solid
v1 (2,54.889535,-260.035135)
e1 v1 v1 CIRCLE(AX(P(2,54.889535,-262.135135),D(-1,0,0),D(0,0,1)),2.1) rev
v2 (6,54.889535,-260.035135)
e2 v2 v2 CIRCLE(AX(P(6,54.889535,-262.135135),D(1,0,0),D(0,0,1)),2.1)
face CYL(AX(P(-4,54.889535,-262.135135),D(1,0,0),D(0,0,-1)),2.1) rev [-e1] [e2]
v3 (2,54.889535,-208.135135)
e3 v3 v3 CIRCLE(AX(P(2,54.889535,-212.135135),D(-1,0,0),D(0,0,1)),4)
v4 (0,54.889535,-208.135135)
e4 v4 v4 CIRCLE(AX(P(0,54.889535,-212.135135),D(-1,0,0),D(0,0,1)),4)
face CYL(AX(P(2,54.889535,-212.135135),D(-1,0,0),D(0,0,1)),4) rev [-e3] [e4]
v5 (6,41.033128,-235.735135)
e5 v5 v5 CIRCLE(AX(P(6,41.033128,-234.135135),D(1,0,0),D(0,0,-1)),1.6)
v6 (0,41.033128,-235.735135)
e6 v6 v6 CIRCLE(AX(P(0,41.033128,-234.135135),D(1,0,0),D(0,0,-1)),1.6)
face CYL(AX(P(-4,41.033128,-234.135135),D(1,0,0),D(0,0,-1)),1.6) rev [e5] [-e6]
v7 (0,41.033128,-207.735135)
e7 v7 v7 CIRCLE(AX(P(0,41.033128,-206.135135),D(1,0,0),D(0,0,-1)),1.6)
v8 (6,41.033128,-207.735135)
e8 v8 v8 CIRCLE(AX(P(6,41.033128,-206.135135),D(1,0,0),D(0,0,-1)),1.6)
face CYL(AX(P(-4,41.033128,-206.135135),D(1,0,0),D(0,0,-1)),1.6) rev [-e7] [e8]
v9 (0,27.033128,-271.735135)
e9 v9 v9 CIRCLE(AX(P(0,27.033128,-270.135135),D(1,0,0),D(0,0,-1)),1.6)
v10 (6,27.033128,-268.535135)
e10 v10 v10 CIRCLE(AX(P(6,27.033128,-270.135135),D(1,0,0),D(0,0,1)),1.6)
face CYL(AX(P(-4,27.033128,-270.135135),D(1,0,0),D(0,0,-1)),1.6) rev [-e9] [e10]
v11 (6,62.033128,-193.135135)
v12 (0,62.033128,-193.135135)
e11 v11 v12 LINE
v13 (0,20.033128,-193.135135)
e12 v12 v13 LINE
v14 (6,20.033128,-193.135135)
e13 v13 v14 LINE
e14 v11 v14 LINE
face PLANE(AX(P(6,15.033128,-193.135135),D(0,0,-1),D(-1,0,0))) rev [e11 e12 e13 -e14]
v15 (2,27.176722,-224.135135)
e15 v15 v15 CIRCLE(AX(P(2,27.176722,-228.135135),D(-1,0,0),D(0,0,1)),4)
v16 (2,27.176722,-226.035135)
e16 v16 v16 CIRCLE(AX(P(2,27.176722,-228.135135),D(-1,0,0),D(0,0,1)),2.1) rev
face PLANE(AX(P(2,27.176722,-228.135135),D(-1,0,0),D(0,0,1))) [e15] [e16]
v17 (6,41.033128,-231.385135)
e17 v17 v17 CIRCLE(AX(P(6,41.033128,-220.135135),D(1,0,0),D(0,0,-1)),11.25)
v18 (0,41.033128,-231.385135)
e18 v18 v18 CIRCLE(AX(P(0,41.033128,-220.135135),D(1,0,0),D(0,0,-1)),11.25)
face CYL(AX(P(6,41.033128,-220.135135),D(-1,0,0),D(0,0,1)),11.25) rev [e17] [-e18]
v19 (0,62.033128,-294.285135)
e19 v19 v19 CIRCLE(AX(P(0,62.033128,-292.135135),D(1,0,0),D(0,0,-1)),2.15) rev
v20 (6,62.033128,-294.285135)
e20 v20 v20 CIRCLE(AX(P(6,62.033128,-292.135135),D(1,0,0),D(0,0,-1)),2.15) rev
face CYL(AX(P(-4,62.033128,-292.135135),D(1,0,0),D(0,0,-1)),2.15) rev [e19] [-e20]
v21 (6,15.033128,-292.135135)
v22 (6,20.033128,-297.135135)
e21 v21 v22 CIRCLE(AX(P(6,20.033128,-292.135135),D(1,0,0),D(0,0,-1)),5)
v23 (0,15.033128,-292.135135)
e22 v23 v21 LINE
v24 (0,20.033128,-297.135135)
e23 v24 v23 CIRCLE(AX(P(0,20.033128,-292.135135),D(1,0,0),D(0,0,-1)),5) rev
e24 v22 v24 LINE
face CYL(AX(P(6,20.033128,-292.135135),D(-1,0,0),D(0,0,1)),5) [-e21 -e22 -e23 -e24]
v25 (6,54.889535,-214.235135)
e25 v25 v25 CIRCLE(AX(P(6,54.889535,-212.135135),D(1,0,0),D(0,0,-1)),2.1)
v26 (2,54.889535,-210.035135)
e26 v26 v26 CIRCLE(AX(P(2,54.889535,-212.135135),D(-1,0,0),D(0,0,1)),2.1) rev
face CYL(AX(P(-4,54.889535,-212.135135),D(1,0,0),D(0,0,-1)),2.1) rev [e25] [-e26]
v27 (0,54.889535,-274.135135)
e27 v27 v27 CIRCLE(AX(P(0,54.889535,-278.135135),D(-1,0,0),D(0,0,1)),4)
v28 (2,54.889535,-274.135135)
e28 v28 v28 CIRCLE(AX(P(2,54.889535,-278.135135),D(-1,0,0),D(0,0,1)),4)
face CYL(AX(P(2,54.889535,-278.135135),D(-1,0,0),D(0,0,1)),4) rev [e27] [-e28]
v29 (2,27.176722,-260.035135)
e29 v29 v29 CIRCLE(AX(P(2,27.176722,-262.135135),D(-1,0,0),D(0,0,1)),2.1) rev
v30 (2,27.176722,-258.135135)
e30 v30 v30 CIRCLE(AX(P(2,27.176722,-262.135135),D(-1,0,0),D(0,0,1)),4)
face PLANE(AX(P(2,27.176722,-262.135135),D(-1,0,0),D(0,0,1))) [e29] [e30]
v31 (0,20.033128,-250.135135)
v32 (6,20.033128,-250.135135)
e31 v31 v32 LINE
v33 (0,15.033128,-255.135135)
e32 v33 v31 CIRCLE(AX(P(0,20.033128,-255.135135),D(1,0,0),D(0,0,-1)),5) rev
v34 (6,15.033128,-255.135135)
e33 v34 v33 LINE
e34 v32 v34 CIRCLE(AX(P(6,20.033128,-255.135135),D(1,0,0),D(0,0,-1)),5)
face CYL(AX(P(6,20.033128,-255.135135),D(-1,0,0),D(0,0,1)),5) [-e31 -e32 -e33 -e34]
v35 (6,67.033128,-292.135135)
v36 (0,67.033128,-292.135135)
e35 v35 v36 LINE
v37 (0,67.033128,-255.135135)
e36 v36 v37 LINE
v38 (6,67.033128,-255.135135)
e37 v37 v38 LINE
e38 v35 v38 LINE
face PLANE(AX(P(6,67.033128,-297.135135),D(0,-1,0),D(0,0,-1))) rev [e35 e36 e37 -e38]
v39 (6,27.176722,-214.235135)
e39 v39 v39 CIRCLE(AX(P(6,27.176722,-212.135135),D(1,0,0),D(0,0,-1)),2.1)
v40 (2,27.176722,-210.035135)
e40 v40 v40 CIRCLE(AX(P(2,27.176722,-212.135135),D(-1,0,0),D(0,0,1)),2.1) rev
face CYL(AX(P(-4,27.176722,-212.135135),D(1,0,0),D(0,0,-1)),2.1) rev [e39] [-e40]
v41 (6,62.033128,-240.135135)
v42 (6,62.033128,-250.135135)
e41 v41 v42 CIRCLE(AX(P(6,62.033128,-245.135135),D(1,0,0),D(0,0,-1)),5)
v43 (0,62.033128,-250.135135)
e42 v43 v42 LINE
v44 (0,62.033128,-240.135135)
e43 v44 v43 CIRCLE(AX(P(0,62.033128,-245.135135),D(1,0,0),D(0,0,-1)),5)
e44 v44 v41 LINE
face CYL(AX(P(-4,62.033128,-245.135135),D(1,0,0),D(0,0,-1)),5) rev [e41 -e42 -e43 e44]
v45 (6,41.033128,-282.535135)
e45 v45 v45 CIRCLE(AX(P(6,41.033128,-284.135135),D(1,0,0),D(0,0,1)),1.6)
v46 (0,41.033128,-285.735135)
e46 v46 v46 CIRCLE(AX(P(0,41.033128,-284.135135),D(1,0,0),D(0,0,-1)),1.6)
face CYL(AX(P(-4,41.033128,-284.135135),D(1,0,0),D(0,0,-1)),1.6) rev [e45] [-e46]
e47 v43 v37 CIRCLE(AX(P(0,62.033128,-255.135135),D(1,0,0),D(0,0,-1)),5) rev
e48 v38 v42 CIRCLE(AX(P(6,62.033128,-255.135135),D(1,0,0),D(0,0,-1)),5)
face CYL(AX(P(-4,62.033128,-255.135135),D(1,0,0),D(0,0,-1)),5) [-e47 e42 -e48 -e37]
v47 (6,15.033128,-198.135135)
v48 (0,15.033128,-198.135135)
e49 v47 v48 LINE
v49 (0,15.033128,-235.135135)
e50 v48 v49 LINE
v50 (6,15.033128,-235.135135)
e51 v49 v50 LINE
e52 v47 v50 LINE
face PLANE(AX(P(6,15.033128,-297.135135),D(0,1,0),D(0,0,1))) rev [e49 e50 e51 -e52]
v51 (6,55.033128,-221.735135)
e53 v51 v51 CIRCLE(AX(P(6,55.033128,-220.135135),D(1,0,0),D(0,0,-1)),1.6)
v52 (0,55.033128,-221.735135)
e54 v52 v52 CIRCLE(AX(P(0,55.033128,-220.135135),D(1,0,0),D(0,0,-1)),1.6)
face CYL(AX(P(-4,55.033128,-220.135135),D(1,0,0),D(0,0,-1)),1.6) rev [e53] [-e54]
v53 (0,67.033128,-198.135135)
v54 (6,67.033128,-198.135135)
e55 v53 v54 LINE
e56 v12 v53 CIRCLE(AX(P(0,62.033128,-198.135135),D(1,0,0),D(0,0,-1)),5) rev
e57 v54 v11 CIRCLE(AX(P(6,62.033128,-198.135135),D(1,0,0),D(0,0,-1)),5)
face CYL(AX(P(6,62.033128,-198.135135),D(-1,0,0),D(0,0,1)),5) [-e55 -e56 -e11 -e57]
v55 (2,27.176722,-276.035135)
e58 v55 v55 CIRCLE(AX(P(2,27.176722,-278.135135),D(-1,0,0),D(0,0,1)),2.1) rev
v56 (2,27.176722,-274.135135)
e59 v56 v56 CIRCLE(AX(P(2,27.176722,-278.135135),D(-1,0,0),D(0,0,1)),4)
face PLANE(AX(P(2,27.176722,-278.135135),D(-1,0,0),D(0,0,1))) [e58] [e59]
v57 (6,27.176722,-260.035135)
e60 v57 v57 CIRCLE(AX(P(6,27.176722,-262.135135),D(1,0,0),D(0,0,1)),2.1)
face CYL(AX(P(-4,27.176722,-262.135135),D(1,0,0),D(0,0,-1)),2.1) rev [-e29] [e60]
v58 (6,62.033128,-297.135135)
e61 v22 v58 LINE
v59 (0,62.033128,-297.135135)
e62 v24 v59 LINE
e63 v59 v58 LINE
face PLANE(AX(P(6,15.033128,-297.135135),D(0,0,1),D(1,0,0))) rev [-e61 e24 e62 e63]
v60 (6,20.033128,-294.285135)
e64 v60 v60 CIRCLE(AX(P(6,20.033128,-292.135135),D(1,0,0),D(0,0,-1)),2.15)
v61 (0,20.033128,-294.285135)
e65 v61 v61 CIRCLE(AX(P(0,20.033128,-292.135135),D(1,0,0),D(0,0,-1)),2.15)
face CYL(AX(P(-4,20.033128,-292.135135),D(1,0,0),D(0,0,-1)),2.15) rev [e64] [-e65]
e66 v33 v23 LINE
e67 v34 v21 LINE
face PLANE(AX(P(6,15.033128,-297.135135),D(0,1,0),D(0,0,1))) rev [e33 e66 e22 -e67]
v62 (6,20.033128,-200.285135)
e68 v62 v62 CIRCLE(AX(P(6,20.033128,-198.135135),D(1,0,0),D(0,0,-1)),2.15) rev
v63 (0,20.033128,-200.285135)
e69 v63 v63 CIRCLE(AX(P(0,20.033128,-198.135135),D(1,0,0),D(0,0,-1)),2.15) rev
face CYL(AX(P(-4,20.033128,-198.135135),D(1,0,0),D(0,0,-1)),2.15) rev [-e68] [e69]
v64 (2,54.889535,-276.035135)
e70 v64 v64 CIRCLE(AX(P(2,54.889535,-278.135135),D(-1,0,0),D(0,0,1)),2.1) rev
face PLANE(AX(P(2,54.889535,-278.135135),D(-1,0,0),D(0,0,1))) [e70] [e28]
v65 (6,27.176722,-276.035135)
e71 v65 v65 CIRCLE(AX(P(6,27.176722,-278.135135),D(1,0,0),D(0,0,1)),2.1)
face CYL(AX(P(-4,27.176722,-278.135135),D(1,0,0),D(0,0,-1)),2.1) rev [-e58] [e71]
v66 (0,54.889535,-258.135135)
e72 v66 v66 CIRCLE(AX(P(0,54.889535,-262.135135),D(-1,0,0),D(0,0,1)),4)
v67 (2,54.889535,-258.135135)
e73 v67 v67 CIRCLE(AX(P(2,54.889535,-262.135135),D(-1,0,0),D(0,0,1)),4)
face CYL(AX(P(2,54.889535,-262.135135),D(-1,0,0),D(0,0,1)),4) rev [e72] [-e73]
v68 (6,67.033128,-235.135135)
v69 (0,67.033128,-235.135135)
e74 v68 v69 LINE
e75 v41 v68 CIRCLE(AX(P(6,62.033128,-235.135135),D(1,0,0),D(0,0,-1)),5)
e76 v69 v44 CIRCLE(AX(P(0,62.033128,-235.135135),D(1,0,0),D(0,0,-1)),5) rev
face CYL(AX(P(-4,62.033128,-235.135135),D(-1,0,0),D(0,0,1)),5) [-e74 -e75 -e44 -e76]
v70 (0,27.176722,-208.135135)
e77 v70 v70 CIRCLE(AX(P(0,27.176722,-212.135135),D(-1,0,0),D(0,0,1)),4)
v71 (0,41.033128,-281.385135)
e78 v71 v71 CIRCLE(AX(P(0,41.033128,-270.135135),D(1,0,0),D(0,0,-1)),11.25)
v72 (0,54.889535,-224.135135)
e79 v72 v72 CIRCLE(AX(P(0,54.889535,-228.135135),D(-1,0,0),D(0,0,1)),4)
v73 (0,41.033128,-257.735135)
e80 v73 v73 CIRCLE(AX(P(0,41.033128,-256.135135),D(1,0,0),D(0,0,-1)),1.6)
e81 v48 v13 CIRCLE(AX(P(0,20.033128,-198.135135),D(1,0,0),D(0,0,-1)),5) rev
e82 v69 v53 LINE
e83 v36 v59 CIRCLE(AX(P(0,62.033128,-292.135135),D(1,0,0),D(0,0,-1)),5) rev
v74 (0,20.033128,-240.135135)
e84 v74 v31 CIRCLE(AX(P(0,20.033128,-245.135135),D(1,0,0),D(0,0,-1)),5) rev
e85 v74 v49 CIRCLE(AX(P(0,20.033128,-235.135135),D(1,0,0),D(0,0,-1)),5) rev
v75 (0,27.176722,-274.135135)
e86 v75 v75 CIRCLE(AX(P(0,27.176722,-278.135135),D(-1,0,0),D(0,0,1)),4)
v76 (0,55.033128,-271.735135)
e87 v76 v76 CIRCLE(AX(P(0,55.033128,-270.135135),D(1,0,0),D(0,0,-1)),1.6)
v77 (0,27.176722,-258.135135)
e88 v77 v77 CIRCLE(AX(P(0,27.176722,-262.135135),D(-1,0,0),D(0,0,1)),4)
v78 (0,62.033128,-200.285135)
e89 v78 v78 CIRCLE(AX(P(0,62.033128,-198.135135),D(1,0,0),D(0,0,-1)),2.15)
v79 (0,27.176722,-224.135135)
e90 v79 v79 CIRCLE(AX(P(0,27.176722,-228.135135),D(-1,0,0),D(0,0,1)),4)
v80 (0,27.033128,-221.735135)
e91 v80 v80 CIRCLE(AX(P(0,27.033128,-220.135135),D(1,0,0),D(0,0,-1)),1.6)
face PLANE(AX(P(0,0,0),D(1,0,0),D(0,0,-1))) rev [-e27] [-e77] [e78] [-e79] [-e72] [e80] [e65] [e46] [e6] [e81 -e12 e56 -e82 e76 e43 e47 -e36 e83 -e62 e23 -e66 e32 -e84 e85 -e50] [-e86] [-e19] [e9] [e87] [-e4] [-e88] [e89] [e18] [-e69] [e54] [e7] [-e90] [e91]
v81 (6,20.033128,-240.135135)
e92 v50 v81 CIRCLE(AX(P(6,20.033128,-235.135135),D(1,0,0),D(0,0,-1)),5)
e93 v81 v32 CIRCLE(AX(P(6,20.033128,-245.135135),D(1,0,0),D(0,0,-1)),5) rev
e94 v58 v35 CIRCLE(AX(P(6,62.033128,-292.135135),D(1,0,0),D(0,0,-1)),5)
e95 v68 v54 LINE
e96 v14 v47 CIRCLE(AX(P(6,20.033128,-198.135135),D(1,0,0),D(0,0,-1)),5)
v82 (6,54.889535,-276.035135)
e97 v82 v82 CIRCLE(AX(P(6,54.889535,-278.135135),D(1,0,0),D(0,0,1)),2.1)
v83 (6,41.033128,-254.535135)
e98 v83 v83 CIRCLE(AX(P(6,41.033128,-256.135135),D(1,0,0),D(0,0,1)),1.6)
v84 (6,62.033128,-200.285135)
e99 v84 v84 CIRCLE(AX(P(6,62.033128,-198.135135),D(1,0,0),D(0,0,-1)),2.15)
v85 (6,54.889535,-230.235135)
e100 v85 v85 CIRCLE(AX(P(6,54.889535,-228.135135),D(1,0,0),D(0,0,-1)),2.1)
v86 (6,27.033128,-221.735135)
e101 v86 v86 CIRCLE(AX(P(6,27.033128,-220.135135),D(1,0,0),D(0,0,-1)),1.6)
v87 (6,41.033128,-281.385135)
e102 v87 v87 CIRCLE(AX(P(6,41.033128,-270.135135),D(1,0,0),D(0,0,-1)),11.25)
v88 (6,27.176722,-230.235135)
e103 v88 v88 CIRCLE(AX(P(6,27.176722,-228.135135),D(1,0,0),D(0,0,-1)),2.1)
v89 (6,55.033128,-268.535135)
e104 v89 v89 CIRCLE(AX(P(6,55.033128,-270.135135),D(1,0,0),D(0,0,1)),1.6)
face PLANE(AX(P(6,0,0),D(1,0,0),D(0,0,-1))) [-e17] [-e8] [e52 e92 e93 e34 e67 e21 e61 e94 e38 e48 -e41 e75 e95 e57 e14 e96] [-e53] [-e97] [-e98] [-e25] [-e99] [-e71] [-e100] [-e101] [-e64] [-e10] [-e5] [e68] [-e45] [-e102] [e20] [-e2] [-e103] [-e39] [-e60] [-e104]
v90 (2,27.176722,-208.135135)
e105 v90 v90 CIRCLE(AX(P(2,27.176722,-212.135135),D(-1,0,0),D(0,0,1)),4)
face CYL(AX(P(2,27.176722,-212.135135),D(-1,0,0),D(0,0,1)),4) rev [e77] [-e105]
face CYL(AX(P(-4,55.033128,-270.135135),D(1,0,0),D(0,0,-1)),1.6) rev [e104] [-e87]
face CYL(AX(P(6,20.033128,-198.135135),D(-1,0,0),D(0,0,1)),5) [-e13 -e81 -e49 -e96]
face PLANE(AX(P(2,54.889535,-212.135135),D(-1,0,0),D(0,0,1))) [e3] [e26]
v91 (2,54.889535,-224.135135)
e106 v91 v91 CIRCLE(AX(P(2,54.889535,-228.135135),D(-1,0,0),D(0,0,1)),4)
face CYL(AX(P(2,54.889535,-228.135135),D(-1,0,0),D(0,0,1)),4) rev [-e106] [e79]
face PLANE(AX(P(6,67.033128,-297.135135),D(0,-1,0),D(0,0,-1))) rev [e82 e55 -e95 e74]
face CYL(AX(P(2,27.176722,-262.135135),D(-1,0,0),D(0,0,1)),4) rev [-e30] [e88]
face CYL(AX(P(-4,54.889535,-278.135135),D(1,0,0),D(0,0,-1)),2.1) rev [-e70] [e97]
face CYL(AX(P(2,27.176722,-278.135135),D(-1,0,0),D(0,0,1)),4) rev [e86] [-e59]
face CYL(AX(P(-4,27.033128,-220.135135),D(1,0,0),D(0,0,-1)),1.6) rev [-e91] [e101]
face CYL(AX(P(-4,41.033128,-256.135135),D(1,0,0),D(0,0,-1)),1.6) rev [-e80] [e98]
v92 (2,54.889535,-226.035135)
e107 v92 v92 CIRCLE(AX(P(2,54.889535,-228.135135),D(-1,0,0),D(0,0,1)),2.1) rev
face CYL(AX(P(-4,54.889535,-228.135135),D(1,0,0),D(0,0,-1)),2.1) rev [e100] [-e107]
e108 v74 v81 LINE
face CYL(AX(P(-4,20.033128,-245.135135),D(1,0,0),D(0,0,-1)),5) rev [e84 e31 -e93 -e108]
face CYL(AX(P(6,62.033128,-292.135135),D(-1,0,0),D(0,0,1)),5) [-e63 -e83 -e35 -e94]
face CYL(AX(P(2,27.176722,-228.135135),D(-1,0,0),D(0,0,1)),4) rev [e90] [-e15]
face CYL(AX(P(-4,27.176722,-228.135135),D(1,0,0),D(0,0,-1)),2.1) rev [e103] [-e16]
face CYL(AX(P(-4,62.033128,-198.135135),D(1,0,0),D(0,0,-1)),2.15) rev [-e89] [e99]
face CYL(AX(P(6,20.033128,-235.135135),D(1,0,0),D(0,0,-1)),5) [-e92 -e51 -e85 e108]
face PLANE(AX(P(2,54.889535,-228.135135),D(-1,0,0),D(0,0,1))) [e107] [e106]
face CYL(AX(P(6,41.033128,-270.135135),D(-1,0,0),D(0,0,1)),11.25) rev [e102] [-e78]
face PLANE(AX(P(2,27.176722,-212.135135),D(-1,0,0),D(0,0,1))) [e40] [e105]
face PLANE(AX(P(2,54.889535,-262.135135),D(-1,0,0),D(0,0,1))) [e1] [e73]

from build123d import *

# Parameters (mm, degrees)
SKETCH_1_W          = 104
SKETCH_1_H          = 52
SKETCH_1_R          = 11.25
EXTRUDE_1_DEPTH     = 6
SKETCH_2_R          = 2.15
SKETCH_2_R_2        = 5
CUT_EXTRUDE_1_DEPTH = 10
FILLET_2_R          = 5
SKETCH_3_R          = 1.6
SKETCH_3_R_2        = 2.1
CUT_EXTRUDE_2_DEPTH = 10
SKETCH1_R           = 4
CUT_EXTRUDE1_DEPTH  = 2


with BuildPart() as part:
    # 草图1 → 凸台-拉伸1 (new body)
    with BuildSketch(Plane(origin=(0, 0, 0), x_dir=(0, 0, -1), z_dir=(1, 0, 0))):
        with Locations((245.135135135, 41.033128111)):
            Rectangle(SKETCH_1_W, SKETCH_1_H)
        with Locations((220.135135135, 41.033128111)):
            Circle(SKETCH_1_R, mode=Mode.SUBTRACT)
        with Locations((270.135135135, 41.033128111)):
            Circle(SKETCH_1_R, mode=Mode.SUBTRACT)
    extrude(amount=EXTRUDE_1_DEPTH)

    # 草图2 → 切除-拉伸1 (cut)
    # profile 1 of 12: a face of its own
    with BuildSketch(Plane(origin=(6, 0, 0), x_dir=(0, 0, -1), z_dir=(1, 0, 0))):
        with Locations((198.135135135, 62.033128111)):
            Circle(SKETCH_2_R)
    # profile 2 of 12: a face of its own
    with BuildSketch(Plane(origin=(6, 0, 0), x_dir=(0, 0, -1), z_dir=(1, 0, 0))):
        with Locations((198.135135135, 20.033128111)):
            Circle(SKETCH_2_R)
    # profile 3 of 12: a face of its own
    with BuildSketch(Plane(origin=(6, 0, 0), x_dir=(0, 0, -1), z_dir=(1, 0, 0))):
        with Locations((245.135135135, 20.033128111)):
            Circle(SKETCH_2_R_2)
        with Locations((245.135135135, 20.033128111)):
            Circle(SKETCH_2_R, mode=Mode.SUBTRACT)
    # profile 4 of 12: a face of its own
    with BuildSketch(Plane(origin=(6, 0, 0), x_dir=(0, 0, -1), z_dir=(1, 0, 0))):
        with BuildLine():
            Line((245.13513516, 15.033128111), (250.135135135, 15.033128111))
            Line((250.135135135, 15.033128111), (250.135135135, 20.033128111))
            ThreePointArc((250.135135135, 20.033128111), (248.67066905, 16.497594214), (245.13513516, 15.033128111))
        make_face()
    # profile 5 of 12: a face of its own
    with BuildSketch(Plane(origin=(6, 0, 0), x_dir=(0, 0, -1), z_dir=(1, 0, 0))):
        with BuildLine():
            Line((240.135135135, 15.033128111), (245.13513516, 15.033128111))
            ThreePointArc((245.13513516, 15.033128111), (241.599601238, 16.497594196), (240.135135135, 20.033128111))
            Line((240.135135135, 20.033128111), (240.135135135, 15.033128111))
        make_face()
    # profile 6 of 12: a face of its own
    with BuildSketch(Plane(origin=(6, 0, 0), x_dir=(0, 0, -1), z_dir=(1, 0, 0))):
        with Locations((245.135135135, 20.033128111)):
            Circle(SKETCH_2_R)
    # profile 7 of 12: a face of its own
    with BuildSketch(Plane(origin=(6, 0, 0), x_dir=(0, 0, -1), z_dir=(1, 0, 0))):
        with Locations((245.135135135, 62.033128111)):
            Circle(SKETCH_2_R_2)
        with Locations((245.135135135, 62.033128111)):
            Circle(SKETCH_2_R, mode=Mode.SUBTRACT)
    # profile 8 of 12: a face of its own
    with BuildSketch(Plane(origin=(6, 0, 0), x_dir=(0, 0, -1), z_dir=(1, 0, 0))):
        with Locations((245.135135135, 62.033128111)):
            Circle(SKETCH_2_R)
    # profile 9 of 12: a face of its own
    with BuildSketch(Plane(origin=(6, 0, 0), x_dir=(0, 0, -1), z_dir=(1, 0, 0))):
        with BuildLine():
            ThreePointArc((245.135135095, 67.033128111), (248.670669027, 65.568662031), (250.135135135, 62.033128111))
            Line((250.135135135, 62.033128111), (250.135135135, 67.033128111))
            Line((250.135135135, 67.033128111), (245.135135095, 67.033128111))
        make_face()
    # profile 10 of 12: a face of its own
    with BuildSketch(Plane(origin=(6, 0, 0), x_dir=(0, 0, -1), z_dir=(1, 0, 0))):
        with BuildLine():
            Line((240.135135135, 67.033128111), (240.135135135, 62.033128111))
            ThreePointArc((240.135135135, 62.033128111), (241.599601215, 65.568662003), (245.135135095, 67.033128111))
            Line((245.135135095, 67.033128111), (240.135135135, 67.033128111))
        make_face()
    # profile 11 of 12: a face of its own
    with BuildSketch(Plane(origin=(6, 0, 0), x_dir=(0, 0, -1), z_dir=(1, 0, 0))):
        with Locations((292.135135135, 62.033128111)):
            Circle(SKETCH_2_R)
    # profile 12 of 12: a face of its own
    with BuildSketch(Plane(origin=(6, 0, 0), x_dir=(0, 0, -1), z_dir=(1, 0, 0))):
        with Locations((292.135135135, 20.033128111)):
            Circle(SKETCH_2_R)
    extrude(amount=-CUT_EXTRUDE_1_DEPTH, mode=Mode.SUBTRACT)

    # 圆角2
    fillet_2_edges = [part.edges().sort_by_distance(p)[0] for p in [
        (3, 15.033128111, -240.135135135),
        (3, 15.033128111, -193.135135135),
        (3, 67.033128111, -240.135135135),
        (3, 67.033128111, -250.135135135),
        (3, 67.033128111, -297.135135135),
        (3, 15.033128111, -297.135135135),
        (3, 15.033128111, -250.135135135),
        (3, 67.033128111, -193.135135135),
    ]]
    fillet(fillet_2_edges, radius=FILLET_2_R - 0.0001)  # a hair under: the kernel refuses the full size

    # 草图3 → 切除-拉伸2 (cut)
    with BuildSketch(Plane(origin=(6, 0, 0), x_dir=(0, 0, -1), z_dir=(1, 0, 0))):
        with Locations((220.135135135, 55.033128111)):
            Circle(SKETCH_3_R)
        with Locations((228.135135135, 54.889534571)):
            Circle(SKETCH_3_R_2)
        with Locations((228.135135135, 27.17672165)):
            Circle(SKETCH_3_R_2)
        with Locations((212.135135135, 27.17672165)):
            Circle(SKETCH_3_R_2)
        with Locations((212.135135135, 54.889534571)):
            Circle(SKETCH_3_R_2)
        with Locations((234.135135135, 41.033128111)):
            Circle(SKETCH_3_R)
        with Locations((220.135135135, 27.033128111)):
            Circle(SKETCH_3_R)
        with Locations((206.135135135, 41.033128111)):
            Circle(SKETCH_3_R)
        with Locations((284.135135135, 41.033128111)):
            Circle(SKETCH_3_R)
        with Locations((270.135135135, 27.033128111)):
            Circle(SKETCH_3_R)
        with Locations((256.135135135, 41.033128111)):
            Circle(SKETCH_3_R)
        with Locations((278.135135135, 54.889534571)):
            Circle(SKETCH_3_R_2)
        with Locations((278.135135135, 27.17672165)):
            Circle(SKETCH_3_R_2)
        with Locations((262.135135135, 27.17672165)):
            Circle(SKETCH_3_R_2)
        with Locations((262.135135135, 54.889534571)):
            Circle(SKETCH_3_R_2)
        with Locations((270.135135135, 55.033128111)):
            Circle(SKETCH_3_R)
    extrude(amount=-CUT_EXTRUDE_2_DEPTH, mode=Mode.SUBTRACT)

    # Sketch1 → Cut-Extrude1 (cut)
    with BuildSketch(Plane.ZY):
        with Locations((-278.135135135, 27.17672165)):
            Circle(SKETCH1_R)
        with Locations((-278.135135135, 54.889534571)):
            Circle(SKETCH1_R)
        with Locations((-262.135135135, 54.889534571)):
            Circle(SKETCH1_R)
        with Locations((-262.135135135, 27.17672165)):
            Circle(SKETCH1_R)
        with Locations((-228.135135135, 54.889534571)):
            Circle(SKETCH1_R)
        with Locations((-212.135135135, 54.889534571)):
            Circle(SKETCH1_R)
        with Locations((-212.135135135, 27.17672165)):
            Circle(SKETCH1_R)
        with Locations((-228.135135135, 27.17672165)):
            Circle(SKETCH1_R)
    extrude(amount=-CUT_EXTRUDE1_DEPTH, mode=Mode.SUBTRACT)


solid = part.part
